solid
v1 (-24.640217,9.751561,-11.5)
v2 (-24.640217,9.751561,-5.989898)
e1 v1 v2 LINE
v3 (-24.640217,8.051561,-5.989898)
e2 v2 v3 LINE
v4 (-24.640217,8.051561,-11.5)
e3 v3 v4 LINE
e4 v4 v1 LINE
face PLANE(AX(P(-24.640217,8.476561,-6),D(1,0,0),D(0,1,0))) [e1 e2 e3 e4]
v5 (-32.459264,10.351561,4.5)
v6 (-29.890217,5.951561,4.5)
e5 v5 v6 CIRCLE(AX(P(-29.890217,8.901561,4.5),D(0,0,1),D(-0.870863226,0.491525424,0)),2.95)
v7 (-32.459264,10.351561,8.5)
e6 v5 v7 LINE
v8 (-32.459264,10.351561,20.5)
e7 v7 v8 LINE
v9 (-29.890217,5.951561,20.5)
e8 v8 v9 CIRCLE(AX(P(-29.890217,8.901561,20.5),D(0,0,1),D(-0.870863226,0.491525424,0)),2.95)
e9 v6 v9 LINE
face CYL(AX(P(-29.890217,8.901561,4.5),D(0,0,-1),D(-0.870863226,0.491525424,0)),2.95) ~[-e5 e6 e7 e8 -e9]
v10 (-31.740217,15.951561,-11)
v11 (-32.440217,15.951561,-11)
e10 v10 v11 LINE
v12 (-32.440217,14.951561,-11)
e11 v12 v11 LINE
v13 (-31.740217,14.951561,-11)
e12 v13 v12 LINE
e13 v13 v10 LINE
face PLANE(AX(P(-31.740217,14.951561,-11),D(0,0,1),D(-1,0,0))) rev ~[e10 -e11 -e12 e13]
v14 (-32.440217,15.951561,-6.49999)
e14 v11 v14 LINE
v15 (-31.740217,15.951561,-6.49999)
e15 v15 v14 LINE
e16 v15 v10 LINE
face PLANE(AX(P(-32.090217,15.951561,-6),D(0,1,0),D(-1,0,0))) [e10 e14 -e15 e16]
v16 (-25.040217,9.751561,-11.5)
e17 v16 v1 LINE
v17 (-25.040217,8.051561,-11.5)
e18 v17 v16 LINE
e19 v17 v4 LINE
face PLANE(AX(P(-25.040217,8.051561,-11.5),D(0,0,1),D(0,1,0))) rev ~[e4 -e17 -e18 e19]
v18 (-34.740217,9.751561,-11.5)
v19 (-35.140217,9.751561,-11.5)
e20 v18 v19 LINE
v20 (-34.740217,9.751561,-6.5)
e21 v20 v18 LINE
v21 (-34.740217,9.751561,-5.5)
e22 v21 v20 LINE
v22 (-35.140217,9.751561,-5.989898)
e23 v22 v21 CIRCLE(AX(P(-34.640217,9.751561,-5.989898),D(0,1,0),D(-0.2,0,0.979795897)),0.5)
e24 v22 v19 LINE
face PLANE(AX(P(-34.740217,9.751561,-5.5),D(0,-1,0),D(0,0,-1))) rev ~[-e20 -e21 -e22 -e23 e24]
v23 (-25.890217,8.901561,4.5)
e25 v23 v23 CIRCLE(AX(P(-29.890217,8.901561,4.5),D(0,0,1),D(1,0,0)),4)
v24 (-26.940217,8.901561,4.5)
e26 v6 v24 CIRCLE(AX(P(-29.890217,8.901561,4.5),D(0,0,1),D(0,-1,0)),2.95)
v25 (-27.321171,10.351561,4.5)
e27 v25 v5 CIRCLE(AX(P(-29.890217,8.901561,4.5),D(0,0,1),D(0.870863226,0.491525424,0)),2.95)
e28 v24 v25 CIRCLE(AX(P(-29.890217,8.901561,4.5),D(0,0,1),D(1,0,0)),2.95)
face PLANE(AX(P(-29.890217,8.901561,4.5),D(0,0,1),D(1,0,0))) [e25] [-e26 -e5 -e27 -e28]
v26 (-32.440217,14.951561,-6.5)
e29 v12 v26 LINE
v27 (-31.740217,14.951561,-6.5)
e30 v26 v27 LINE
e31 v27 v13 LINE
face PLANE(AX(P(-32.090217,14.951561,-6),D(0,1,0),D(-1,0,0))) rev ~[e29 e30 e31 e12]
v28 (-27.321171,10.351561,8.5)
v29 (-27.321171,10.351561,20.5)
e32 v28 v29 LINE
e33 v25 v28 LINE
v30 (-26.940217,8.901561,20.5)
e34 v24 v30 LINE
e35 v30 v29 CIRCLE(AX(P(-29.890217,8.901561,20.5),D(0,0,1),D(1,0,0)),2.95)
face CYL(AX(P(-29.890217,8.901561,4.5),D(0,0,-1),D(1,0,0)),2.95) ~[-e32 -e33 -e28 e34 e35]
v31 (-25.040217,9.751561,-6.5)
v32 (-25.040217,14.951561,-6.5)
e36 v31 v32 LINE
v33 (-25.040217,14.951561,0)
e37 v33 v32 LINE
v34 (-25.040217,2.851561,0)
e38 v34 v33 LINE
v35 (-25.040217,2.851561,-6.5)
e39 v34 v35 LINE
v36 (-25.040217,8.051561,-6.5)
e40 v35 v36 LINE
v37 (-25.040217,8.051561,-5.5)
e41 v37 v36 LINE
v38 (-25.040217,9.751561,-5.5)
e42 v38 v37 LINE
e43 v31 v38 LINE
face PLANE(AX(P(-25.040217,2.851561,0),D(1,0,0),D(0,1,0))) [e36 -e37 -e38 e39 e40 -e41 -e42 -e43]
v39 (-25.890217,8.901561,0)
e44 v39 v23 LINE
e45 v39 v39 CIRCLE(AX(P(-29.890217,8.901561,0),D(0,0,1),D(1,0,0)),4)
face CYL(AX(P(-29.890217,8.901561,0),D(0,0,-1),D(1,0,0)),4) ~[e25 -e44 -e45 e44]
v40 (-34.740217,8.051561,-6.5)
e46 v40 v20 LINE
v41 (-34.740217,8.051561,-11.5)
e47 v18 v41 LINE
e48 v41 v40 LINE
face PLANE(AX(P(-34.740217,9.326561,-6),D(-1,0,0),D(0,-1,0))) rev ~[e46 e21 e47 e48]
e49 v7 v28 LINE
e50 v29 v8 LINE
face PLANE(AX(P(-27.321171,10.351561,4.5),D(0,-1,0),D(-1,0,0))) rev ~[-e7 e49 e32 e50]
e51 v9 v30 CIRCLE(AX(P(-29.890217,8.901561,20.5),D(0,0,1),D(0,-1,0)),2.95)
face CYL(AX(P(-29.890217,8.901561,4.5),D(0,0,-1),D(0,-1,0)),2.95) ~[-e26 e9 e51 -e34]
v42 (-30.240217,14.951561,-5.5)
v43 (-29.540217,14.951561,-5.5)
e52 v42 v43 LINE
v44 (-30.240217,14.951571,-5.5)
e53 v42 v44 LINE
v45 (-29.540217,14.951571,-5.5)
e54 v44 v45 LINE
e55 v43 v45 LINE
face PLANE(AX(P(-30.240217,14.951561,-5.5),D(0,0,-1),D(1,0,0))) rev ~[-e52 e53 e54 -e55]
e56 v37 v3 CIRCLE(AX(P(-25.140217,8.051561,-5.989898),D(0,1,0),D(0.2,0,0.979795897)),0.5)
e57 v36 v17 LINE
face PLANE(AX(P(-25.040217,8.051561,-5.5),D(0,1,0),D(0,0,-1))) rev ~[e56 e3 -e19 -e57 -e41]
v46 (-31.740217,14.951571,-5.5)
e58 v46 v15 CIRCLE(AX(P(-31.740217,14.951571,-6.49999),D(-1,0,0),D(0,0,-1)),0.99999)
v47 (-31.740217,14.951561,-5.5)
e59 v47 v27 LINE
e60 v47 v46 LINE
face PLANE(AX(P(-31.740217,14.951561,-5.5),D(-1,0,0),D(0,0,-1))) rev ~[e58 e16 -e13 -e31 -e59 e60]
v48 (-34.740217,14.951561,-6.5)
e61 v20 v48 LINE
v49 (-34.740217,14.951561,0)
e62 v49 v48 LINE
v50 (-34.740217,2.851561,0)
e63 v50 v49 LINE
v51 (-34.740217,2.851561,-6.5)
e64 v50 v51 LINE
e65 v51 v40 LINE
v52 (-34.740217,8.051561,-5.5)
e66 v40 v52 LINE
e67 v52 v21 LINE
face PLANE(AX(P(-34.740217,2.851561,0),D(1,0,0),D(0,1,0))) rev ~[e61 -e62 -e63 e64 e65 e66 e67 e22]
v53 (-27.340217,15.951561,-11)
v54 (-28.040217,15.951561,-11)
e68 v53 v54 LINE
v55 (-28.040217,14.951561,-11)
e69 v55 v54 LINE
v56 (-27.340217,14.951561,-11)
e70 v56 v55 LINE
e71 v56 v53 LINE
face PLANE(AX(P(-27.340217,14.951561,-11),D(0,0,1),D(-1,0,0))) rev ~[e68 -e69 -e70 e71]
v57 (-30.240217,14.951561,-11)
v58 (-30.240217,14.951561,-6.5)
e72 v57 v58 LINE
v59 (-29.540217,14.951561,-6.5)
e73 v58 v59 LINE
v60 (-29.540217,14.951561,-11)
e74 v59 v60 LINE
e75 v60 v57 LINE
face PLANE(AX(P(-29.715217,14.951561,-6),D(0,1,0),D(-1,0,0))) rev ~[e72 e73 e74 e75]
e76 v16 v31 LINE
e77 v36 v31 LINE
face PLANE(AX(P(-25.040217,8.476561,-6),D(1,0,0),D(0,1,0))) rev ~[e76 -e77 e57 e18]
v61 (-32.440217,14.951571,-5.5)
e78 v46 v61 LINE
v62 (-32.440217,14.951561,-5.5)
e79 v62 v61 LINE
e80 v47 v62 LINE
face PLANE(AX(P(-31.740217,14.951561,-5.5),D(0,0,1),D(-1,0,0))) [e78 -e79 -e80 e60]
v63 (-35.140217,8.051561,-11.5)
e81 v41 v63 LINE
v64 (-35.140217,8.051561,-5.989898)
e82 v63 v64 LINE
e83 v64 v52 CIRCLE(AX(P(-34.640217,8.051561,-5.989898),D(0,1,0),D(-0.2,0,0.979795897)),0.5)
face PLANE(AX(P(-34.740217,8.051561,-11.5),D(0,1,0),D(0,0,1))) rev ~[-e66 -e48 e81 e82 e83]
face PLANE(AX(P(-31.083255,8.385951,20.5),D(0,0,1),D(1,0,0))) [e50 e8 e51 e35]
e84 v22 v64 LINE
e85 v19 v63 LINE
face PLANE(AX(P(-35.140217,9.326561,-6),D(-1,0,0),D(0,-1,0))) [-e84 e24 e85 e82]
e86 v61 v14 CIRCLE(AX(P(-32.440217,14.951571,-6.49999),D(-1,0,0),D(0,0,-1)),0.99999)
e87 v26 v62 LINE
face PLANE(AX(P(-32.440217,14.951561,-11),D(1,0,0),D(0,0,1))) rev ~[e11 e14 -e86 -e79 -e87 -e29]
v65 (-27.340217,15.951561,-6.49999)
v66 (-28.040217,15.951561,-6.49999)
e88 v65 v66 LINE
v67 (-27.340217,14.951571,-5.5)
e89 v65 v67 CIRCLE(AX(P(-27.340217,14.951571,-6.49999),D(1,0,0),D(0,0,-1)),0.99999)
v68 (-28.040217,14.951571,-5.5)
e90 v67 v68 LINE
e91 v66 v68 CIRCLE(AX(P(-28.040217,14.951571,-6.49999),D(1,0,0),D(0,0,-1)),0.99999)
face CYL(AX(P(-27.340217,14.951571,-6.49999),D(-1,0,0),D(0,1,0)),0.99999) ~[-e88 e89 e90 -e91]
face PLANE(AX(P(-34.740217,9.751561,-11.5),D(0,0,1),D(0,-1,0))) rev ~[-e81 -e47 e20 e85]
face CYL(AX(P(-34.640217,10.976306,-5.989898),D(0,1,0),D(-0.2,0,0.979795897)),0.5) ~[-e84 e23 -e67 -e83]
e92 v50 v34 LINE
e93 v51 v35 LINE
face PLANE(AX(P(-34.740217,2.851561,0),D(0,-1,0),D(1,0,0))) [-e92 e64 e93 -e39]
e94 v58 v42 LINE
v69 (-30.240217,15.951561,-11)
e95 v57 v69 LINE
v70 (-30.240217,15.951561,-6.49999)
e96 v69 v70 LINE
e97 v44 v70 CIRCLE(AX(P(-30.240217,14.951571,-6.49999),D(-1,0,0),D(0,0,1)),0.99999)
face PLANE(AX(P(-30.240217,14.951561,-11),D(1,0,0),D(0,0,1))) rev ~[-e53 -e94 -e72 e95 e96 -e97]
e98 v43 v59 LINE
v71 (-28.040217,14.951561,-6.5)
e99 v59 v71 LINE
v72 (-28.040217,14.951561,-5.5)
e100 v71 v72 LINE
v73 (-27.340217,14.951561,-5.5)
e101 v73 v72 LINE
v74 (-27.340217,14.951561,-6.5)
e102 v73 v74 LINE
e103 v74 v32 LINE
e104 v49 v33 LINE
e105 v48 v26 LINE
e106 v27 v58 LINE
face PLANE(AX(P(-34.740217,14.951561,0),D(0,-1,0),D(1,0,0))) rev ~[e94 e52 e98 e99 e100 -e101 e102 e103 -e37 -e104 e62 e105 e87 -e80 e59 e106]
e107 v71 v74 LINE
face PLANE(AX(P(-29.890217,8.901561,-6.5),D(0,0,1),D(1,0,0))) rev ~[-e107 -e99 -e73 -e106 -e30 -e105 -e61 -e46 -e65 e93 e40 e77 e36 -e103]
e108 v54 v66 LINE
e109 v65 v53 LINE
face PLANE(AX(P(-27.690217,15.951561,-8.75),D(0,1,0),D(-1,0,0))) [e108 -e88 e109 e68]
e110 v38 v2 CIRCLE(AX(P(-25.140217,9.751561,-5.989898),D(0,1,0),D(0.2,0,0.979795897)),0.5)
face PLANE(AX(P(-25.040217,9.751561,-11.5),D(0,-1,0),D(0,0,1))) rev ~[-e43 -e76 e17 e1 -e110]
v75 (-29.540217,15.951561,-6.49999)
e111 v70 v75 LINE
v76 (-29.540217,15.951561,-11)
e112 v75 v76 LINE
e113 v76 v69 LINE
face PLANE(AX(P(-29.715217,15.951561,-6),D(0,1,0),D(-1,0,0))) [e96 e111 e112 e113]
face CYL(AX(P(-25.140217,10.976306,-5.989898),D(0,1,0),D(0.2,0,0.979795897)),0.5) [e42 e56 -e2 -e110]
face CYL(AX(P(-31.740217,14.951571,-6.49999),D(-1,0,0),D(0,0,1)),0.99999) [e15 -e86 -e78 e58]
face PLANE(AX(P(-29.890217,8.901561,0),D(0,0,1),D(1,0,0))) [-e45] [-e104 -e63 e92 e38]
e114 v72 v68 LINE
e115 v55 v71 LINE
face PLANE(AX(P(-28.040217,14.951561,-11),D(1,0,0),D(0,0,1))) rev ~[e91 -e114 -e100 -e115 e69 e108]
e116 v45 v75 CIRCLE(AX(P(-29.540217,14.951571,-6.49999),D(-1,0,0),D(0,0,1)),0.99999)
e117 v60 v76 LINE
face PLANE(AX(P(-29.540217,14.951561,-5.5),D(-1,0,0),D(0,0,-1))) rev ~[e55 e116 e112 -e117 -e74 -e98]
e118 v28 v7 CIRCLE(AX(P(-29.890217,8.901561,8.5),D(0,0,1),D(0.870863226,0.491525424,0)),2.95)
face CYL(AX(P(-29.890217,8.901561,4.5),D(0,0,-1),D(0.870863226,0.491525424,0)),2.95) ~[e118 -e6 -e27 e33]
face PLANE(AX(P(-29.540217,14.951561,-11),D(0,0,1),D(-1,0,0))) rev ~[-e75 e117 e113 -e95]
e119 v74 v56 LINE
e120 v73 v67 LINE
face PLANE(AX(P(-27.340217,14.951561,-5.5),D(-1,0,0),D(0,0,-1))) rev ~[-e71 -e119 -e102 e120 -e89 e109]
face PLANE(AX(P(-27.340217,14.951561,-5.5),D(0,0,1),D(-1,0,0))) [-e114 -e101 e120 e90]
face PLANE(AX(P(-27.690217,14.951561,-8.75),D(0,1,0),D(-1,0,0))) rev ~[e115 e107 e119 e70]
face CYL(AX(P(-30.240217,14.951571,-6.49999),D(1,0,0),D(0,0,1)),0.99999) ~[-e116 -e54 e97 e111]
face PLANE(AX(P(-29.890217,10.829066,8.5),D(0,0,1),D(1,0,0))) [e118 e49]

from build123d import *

# Parameters (mm, degrees)
F0_W         = 9.7
F0_H         = 12.1
F0_R         = 4
F1_DEPTH     = 6.5
F2_DEPTH     = 4.5
F4_DEPTH     = 16
F5_DEPTH     = 4
F6_W         = 0.7
F6_H         = 4.5
F6_H_2       = 1
F6_W_2       = 0.35
F7_DEPTH     = 1
F8_R         = 0.99999
F9_W         = 0.85
F9_H         = 1
F10_DEPTH    = 0.4
F11_T1_DEPTH = 4.1494897428
F12_W        = 0.85
F12_H        = 1
F13_DEPTH    = 0.4
F14_T1_DEPTH = 4.1494897428


# Not quite as in the source:
# - a fillet or chamfer that OpenCascade refuses, or shapes differently, is made with other operations: its cross-section is extruded or revolved along the edge and cut away or added
# - a fillet or chamfer is up to 0.001 mm smaller than in the source, because OpenCascade refuses the exact size


with BuildPart() as f1:
    # F0 (on Top) → F1 (new body)
    with BuildSketch(Plane.XY):
        with Locations((-29.8902173527, 8.9015606931)):
            Rectangle(F0_W, F0_H)
        with Locations((-29.8902173527, 8.9015606931)):
            Circle(F0_R, mode=Mode.SUBTRACT)
        with Locations((-29.8902173527, 8.9015606931)):
            Circle(F0_R)
    extrude(amount=-F1_DEPTH)

    # F0 (on Top) → F2 (join)
    with BuildSketch(Plane.XY):
        with Locations((-29.8902173527, 8.9015606931)):
            Circle(F0_R)
    extrude(amount=F2_DEPTH)

    # F3 (on face) → F4 (join)
    with BuildSketch(Plane.XY.offset(4.5)):
        with BuildLine():
            ThreePointArc((-32.4592638684, 10.3515606931), (-32.4377651932, 7.4141132151), (-29.8902173527, 5.9515606931))
            Line((-29.8902173527, 5.9515606931), (-29.8902173527, 10.3515606931))
            Line((-29.8902173527, 10.3515606931), (-32.4592638684, 10.3515606931))
        make_face()
        with BuildLine():
            ThreePointArc((-29.8902173527, 5.9515606931), (-27.8042523482, 6.8155956886), (-26.9402173527, 8.9015606931))
            ThreePointArc((-26.9402173527, 8.9015606931), (-27.0370448008, 9.6511648482), (-27.3211708369, 10.3515606931))
            Line((-27.3211708369, 10.3515606931), (-29.8902173527, 10.3515606931))
            Line((-29.8902173527, 10.3515606931), (-29.8902173527, 5.9515606931))
        make_face()
    extrude(amount=F4_DEPTH)

    # F3 (on face) → F5 (join)
    with BuildSketch(Plane.XY.offset(4.5)):
        with BuildLine():
            Line((-29.8902173527, 10.3515606931), (-27.3211708369, 10.3515606931))
            ThreePointArc((-27.3211708369, 10.3515606931), (-29.8902173527, 11.8515606931), (-32.4592638684, 10.3515606931))
            Line((-32.4592638684, 10.3515606931), (-29.8902173527, 10.3515606931))
        make_face()
    extrude(amount=F5_DEPTH)

    # F6 (on face) → F7 (join)
    with BuildSketch(Plane(origin=(0, 14.9515606931, 0), x_dir=(-1, 0, 0), z_dir=(0, 1, 0))):
        with Locations((27.6902173527, -8.75)):
            Rectangle(F6_W, F6_H)
        with Locations((27.6902173527, -6)):
            Rectangle(F6_W, F6_H_2)
        with Locations((29.7152173527, -6)):
            Rectangle(F6_W_2, F6_H_2)
        with Locations((30.0652173527, -6)):
            Rectangle(F6_W_2, F6_H_2)
        Polygon((30.2402173527, -11), (30.2402173527, -6.5), (29.8902173527, -6.5), (29.5402173527, -6.5), (29.5402173527, -11), align=None)
        with Locations((32.0902173527, -6)):
            Rectangle(F6_W, F6_H_2)
        with Locations((32.0902173527, -8.75)):
            Rectangle(F6_W, F6_H)
    extrude(amount=F7_DEPTH)

    # F8 (radius 1 in the source; OpenCascade refuses exactly that, so slightly less here)
    f8_edges = [f1.edges().sort_by_distance(p)[0] for p in [
        (-27.690217, 15.951561, -5.5),
        (-29.890217, 15.951561, -5.5),
        (-32.090217, 15.951561, -5.5),
    ]]
    fillet(f8_edges, radius=F8_R)

    # F9 (on face) → F10 (join)
    with BuildSketch(Plane.YZ.offset(-25.0402173527)):
        with Locations((8.4765606931, -6)):
            Rectangle(F9_W, F9_H)
        with Locations((9.3265606931, -6)):
            Rectangle(F9_W, F9_H)
        Polygon((9.7515606931, -6.5), (8.9015606931, -6.5), (8.0515606931, -6.5), (8.0515606931, -11.5), (9.7515606931, -11.5), align=None)
    extrude(amount=F10_DEPTH)

    # F11: fillet of radius 0.5 on 1 edges, made by hand

    # F11_s2 → F11_t1 (cut)
    with BuildSketch(Plane.XZ.offset(-10.9763055645)):
        with BuildLine():
            ThreePointArc((-25.0402173527, -5.5), (-24.752919018, -5.6736701825), (-24.6402173527, -5.9898979486))
            Line((-24.6402173527, -5.9898979486), (-24.6402173527, -5.5))
            Line((-24.6402173527, -5.5), (-25.0402173527, -5.5))
        make_face()
    extrude(amount=F11_T1_DEPTH, mode=Mode.SUBTRACT)

    # F12 (on face) → F13 (join)
    with BuildSketch(Plane(origin=(-34.7402173527, 0, 0), x_dir=(0, -1, 0), z_dir=(-1, 0, 0))):
        with Locations((-9.3265606931, -6)):
            Rectangle(F12_W, F12_H)
        with Locations((-8.4765606931, -6)):
            Rectangle(F12_W, F12_H)
        Polygon((-8.9015606931, -6.5), (-9.7515606931, -6.5), (-9.7515606931, -11.5), (-8.0515606931, -11.5), (-8.0515606931, -6.5), align=None)
    extrude(amount=F13_DEPTH)

    # F14: fillet of radius 0.5 on 1 edges, made by hand

    # F14_s2 → F14_t1 (cut)
    with BuildSketch(Plane.XZ.offset(-10.9763055645)):
        with BuildLine():
            ThreePointArc((-34.7402173527, -5.5), (-35.0275156873, -5.6736701825), (-35.1402173527, -5.9898979486))
            Line((-35.1402173527, -5.9898979486), (-35.1402173527, -5.5))
            Line((-35.1402173527, -5.5), (-34.7402173527, -5.5))
        make_face()
    extrude(amount=F14_T1_DEPTH, mode=Mode.SUBTRACT)


solid = f1.part
